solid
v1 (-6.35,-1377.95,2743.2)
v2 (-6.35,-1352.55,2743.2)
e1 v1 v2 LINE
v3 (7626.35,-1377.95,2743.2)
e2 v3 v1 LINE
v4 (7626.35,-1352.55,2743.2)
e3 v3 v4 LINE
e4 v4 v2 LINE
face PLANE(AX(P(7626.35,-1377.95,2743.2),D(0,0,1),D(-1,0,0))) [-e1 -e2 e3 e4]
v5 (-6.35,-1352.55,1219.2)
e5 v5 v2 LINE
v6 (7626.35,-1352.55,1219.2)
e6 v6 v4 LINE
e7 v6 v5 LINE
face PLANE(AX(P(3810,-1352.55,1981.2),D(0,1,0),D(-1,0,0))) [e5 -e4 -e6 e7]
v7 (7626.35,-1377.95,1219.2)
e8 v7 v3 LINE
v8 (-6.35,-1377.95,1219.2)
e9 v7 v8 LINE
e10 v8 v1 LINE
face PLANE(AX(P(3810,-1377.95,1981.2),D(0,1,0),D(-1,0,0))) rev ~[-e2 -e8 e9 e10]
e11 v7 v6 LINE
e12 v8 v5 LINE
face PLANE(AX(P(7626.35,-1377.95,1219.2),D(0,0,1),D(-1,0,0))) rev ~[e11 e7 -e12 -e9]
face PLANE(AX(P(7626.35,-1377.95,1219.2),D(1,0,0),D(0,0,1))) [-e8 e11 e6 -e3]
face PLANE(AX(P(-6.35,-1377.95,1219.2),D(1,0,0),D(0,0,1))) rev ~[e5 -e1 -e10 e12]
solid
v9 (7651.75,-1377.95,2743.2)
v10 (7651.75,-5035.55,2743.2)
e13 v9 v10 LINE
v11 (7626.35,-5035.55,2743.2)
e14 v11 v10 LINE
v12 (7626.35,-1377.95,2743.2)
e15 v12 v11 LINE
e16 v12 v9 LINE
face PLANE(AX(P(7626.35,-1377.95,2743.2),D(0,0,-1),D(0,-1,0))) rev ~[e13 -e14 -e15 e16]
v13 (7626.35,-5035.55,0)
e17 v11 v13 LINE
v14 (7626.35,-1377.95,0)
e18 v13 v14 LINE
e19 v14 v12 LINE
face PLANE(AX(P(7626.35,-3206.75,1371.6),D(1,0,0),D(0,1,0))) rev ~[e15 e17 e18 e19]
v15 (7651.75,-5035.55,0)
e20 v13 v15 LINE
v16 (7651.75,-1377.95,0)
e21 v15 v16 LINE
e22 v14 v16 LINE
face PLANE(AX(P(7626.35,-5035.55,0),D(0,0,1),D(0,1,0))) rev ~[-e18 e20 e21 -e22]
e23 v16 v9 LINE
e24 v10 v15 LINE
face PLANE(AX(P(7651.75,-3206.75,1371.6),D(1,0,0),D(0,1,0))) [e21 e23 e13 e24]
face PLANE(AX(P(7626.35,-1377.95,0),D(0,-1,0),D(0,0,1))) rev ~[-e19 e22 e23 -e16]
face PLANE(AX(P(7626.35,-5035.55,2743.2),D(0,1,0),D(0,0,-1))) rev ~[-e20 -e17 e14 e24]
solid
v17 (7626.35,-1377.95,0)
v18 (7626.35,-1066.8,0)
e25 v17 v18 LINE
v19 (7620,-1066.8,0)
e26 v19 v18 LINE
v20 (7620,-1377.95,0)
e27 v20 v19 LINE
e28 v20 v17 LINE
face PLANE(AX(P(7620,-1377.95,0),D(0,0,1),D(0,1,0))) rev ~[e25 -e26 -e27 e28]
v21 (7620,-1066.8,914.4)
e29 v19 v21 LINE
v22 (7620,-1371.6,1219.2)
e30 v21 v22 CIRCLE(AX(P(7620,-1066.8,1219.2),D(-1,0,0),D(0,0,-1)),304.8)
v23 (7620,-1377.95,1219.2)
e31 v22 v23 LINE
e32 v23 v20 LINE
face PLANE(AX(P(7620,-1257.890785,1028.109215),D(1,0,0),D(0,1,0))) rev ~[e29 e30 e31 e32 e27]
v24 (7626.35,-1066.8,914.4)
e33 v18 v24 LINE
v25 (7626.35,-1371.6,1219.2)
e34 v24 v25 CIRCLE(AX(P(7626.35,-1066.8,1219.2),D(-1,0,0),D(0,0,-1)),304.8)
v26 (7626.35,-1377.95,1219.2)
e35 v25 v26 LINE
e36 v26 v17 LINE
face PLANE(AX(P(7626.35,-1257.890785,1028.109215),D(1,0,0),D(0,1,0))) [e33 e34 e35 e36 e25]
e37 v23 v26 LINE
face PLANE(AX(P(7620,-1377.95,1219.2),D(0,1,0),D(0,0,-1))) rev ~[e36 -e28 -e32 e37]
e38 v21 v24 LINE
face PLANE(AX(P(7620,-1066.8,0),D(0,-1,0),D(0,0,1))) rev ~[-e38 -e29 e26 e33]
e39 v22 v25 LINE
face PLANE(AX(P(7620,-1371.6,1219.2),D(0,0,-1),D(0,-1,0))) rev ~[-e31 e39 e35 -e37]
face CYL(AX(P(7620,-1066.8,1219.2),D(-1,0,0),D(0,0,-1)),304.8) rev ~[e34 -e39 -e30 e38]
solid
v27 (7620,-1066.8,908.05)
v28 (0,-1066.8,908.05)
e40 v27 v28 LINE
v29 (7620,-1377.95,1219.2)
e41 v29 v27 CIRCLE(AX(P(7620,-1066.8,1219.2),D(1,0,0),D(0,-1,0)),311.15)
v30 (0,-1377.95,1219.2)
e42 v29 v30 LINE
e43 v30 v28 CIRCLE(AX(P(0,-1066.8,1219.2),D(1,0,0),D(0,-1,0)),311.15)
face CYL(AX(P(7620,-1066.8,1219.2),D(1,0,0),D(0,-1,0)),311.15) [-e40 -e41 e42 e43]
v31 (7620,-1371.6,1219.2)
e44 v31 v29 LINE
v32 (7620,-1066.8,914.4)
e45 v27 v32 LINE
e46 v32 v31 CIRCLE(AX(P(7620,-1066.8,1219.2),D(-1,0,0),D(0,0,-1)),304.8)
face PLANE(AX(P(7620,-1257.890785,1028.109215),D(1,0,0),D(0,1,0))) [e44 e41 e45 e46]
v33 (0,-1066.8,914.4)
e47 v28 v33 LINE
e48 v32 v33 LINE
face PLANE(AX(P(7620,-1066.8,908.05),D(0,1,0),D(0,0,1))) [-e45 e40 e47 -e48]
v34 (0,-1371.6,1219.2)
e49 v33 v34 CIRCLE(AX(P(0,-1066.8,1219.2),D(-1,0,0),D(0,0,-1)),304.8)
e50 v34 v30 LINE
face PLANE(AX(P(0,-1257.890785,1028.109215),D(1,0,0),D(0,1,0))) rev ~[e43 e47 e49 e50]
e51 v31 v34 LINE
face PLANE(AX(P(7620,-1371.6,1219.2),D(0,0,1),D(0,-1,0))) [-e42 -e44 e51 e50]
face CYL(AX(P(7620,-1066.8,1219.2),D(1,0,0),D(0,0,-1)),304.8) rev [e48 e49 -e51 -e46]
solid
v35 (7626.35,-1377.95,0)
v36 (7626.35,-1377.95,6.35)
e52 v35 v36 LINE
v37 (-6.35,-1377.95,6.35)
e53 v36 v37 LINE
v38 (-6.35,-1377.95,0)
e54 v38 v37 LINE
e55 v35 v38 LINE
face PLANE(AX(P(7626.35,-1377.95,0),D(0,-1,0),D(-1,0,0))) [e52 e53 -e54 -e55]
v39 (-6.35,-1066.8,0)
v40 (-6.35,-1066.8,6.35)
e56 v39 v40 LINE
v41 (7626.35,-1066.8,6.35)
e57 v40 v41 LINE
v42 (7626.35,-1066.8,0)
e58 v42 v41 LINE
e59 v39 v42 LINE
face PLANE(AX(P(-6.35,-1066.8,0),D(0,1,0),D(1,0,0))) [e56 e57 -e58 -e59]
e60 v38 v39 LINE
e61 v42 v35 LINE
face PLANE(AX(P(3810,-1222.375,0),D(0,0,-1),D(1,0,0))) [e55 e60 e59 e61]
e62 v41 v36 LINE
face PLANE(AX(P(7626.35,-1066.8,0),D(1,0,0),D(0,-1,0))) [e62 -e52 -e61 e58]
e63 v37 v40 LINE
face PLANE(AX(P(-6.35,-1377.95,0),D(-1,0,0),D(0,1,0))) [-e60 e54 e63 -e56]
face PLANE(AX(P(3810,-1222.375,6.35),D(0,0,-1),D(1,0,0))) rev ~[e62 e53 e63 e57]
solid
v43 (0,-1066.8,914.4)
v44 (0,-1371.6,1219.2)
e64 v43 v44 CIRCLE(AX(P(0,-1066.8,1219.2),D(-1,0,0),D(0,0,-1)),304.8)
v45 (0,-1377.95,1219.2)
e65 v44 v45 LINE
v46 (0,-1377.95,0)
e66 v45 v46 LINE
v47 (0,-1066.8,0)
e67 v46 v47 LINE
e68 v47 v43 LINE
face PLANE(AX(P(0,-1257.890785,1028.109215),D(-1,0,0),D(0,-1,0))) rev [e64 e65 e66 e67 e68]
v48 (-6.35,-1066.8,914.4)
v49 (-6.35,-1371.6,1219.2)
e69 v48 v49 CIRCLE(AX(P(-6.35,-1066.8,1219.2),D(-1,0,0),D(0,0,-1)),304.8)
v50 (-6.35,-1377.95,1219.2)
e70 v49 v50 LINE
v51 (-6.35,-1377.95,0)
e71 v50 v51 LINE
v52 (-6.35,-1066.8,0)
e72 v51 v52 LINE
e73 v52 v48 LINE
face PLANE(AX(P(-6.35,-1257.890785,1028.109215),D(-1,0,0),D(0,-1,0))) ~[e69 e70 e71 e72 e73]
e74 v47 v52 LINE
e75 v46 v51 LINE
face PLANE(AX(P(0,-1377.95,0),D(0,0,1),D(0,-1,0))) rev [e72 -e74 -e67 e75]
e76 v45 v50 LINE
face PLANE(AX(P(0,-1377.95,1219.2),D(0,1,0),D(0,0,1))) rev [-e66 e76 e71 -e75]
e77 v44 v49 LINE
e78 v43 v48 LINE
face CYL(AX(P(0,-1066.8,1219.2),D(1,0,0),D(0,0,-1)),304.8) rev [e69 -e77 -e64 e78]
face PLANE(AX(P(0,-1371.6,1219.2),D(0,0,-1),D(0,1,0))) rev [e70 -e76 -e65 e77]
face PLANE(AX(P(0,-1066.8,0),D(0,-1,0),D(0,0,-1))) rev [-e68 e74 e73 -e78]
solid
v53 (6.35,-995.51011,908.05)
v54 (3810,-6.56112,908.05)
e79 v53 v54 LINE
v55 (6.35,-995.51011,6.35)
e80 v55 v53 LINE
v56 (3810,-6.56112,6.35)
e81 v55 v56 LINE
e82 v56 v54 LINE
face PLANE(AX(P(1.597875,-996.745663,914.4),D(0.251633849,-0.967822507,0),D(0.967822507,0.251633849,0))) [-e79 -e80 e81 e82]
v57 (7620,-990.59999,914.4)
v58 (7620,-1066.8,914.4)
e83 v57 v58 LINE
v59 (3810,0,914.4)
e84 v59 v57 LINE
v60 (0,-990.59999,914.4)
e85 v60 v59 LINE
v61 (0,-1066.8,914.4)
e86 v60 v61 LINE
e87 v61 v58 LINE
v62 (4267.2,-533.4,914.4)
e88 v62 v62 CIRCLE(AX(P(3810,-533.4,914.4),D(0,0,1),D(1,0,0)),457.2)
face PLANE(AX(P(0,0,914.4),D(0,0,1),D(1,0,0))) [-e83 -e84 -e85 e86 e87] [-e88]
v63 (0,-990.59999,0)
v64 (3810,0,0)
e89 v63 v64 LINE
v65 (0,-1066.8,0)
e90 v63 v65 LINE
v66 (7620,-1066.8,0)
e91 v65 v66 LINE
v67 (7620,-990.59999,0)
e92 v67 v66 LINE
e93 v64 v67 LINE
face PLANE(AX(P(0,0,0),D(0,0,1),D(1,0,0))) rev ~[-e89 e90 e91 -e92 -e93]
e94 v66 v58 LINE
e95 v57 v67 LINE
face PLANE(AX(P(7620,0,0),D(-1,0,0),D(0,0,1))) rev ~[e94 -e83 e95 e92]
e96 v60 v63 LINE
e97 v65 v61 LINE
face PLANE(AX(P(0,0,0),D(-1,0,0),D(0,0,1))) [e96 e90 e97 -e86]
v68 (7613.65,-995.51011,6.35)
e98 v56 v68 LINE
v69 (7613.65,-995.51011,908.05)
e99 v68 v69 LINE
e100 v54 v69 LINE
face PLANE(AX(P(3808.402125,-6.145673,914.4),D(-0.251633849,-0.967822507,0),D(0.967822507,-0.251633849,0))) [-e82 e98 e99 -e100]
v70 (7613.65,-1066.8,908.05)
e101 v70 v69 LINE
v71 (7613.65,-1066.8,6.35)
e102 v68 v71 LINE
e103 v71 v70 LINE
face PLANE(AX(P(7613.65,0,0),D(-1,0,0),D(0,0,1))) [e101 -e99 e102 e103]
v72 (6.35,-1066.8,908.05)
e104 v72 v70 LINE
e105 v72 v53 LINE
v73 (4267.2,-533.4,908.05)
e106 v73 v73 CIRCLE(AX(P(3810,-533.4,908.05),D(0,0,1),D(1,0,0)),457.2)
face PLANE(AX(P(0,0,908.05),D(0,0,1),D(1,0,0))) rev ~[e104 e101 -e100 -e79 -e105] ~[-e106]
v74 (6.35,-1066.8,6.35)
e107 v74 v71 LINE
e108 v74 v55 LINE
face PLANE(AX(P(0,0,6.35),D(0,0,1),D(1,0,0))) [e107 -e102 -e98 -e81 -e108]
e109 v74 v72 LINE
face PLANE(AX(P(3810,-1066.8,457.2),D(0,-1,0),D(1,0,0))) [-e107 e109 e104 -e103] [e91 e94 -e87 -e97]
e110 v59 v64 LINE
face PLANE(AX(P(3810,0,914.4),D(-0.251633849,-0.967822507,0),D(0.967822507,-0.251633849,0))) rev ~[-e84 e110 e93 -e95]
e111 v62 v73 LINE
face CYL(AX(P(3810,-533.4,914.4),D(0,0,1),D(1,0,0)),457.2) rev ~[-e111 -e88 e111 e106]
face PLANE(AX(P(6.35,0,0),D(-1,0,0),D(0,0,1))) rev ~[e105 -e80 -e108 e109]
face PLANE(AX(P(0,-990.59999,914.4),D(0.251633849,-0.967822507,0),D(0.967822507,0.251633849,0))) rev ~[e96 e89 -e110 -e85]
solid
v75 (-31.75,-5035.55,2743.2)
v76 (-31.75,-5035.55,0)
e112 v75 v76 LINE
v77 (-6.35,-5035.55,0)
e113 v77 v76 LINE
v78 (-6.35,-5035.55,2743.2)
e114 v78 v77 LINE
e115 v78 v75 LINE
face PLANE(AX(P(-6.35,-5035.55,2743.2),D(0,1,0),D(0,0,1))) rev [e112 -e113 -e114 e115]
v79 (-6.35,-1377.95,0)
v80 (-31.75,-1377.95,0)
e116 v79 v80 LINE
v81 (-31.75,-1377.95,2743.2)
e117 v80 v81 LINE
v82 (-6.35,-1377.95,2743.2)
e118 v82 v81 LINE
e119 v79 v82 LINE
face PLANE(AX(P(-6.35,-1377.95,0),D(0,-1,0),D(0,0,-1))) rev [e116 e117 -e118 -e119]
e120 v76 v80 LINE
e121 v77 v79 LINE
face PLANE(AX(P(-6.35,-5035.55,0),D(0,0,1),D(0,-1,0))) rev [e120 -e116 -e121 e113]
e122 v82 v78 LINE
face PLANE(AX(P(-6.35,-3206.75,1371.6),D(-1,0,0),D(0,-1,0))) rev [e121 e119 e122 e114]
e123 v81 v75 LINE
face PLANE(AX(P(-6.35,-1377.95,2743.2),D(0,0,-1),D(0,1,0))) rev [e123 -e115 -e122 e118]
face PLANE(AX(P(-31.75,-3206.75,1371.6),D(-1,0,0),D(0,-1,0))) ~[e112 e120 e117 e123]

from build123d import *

# Parameters (mm, degrees)
F0_W      = 7620
F0_H      = 914.4
F1_DEPTH  = 1066.8
F3_DEPTH  = 914.401
F4_T      = -6.35
F2_R      = 457.2
F5_DEPTH  = 6.35
F7_DEPTH  = 7620
F9_DEPTH  = 6.35
F14_DEPTH = 6.35
F16_DEPTH = 25.4
F18_W     = 7632.7
F18_H     = 1524
F19_DEPTH = 25.4


# Not quite as in the source:
# - a feature of the source that left no trace in its solid (it failed there, or was rolled back) is left out
# - a pattern or mirror of a feature is missing from the dataset's text; its kind, count and spacing are read off the source's solid


with BuildPart() as f1:
    # F0 (on Front) → F1 (new body)
    with BuildSketch(Plane.XZ):
        with Locations((3810, 457.2)):
            Rectangle(F0_W, F0_H)
    extrude(amount=F1_DEPTH)

    # F2 (on face) → F3 (cut, through all)
    with BuildSketch(Plane.XY.offset(914.4)):
        Polygon((7620, 0), (3810, 0), (7620, -990.5999898911), align=None)
        Polygon((0, -990.5999898911), (3810, 0), (0, 0), align=None)
    extrude(amount=-F3_DEPTH, mode=Mode.SUBTRACT)

    # F4
    f4_openings = [f1.faces().sort_by_distance(p)[0] for p in [
        (3810, -1066.8, 457.2),
    ]]
    offset(amount=F4_T, openings=f4_openings)

    # F2 (on face) → F5 (cut, through all)
    with BuildSketch(Plane.XY.offset(914.4)):
        with Locations((3810, -533.4)):
            Circle(F2_R)
    extrude(amount=-F5_DEPTH, mode=Mode.SUBTRACT)


with BuildPart() as f7:
    # F6 (on face) → F7 (new body, through all)
    with BuildSketch(Plane.YZ.offset(7620)):
        with BuildLine():
            ThreePointArc((-1066.8, 914.4), (-1282.3261469057, 1003.6738530943), (-1371.6, 1219.2))
            Line((-1371.6, 1219.2), (-1377.95, 1219.2))
            ThreePointArc((-1377.95, 1219.2), (-1286.8162749662, 999.1837250338), (-1066.8, 908.05))
            Line((-1066.8, 908.05), (-1066.8, 914.4))
        make_face()
    extrude(amount=-F7_DEPTH)


with BuildPart() as f9:
    # F8 (on face) → F9 (new body)
    with BuildSketch(Plane.YZ.offset(7620)):
        with BuildLine():
            Line((-1371.6, 1219.2), (-1377.95, 1219.2))
            ThreePointArc((-1377.95, 1219.2), (-1286.8162749662, 999.1837250338), (-1066.8, 908.05))
            Line((-1066.8, 908.05), (-1066.8, 914.4))
            ThreePointArc((-1066.8, 914.4), (-1282.3261469057, 1003.6738530943), (-1371.6, 1219.2))
        make_face()
        with BuildLine():
            ThreePointArc((-1066.8, 908.05), (-1286.8162749662, 999.1837250338), (-1377.95, 1219.2))
            Line((-1377.95, 1219.2), (-1377.95, 0))
            Line((-1377.95, 0), (-1066.8, 0))
            Line((-1066.8, 0), (-1066.8, 908.05))
        make_face()
    extrude(amount=F9_DEPTH)


with BuildPart() as f9_copies_1:
    # F9_copies: instance of F9
    add(f9.part.mirror(Plane(origin=(3810, 0, 0), x_dir=(0, 0, -1), z_dir=(-1, 0, 0))))


with BuildPart() as f14:
    # F13 (on face) → F14 (new body)
    with BuildSketch(Plane(origin=(0, 0, 0), x_dir=(1, 0, 0), z_dir=(0, 0, -1))):
        Polygon((-6.35, 1377.95), (-6.35, 1066.8), (0, 1066.8), (7620, 1066.8), (7626.35, 1066.8), (7626.35, 1377.95), align=None)
    extrude(amount=-F14_DEPTH)


with BuildPart() as f16:
    # F15 (on face) → F16 (new body)
    with BuildSketch(Plane.YZ.offset(7626.35)):
        Polygon((-1377.95, 1219.2), (-1377.95, 2743.2), (-5035.55, 2743.2), (-5035.55, 0), (-1377.95, 0), align=None)
    extrude(amount=F16_DEPTH)


with BuildPart() as f16_copies_1:
    # F16_copies: instance of F16
    add(f16.part.mirror(Plane(origin=(3810, 0, 0), x_dir=(0, 0, -1), z_dir=(-1, 0, 0))))


with BuildPart() as f19:
    # F18 (on face) → F19 (new body)
    with BuildSketch(Plane(origin=(0, -1377.95, 0), x_dir=(-1, 0, 0), z_dir=(0, 1, 0))):
        with Locations((-3810, 1981.2)):
            Rectangle(F18_W, F18_H)
    extrude(amount=F19_DEPTH)


solid = Compound([f1.part, f7.part, f9.part, f9_copies_1.part, f14.part, f16.part, f16_copies_1.part, f19.part])
